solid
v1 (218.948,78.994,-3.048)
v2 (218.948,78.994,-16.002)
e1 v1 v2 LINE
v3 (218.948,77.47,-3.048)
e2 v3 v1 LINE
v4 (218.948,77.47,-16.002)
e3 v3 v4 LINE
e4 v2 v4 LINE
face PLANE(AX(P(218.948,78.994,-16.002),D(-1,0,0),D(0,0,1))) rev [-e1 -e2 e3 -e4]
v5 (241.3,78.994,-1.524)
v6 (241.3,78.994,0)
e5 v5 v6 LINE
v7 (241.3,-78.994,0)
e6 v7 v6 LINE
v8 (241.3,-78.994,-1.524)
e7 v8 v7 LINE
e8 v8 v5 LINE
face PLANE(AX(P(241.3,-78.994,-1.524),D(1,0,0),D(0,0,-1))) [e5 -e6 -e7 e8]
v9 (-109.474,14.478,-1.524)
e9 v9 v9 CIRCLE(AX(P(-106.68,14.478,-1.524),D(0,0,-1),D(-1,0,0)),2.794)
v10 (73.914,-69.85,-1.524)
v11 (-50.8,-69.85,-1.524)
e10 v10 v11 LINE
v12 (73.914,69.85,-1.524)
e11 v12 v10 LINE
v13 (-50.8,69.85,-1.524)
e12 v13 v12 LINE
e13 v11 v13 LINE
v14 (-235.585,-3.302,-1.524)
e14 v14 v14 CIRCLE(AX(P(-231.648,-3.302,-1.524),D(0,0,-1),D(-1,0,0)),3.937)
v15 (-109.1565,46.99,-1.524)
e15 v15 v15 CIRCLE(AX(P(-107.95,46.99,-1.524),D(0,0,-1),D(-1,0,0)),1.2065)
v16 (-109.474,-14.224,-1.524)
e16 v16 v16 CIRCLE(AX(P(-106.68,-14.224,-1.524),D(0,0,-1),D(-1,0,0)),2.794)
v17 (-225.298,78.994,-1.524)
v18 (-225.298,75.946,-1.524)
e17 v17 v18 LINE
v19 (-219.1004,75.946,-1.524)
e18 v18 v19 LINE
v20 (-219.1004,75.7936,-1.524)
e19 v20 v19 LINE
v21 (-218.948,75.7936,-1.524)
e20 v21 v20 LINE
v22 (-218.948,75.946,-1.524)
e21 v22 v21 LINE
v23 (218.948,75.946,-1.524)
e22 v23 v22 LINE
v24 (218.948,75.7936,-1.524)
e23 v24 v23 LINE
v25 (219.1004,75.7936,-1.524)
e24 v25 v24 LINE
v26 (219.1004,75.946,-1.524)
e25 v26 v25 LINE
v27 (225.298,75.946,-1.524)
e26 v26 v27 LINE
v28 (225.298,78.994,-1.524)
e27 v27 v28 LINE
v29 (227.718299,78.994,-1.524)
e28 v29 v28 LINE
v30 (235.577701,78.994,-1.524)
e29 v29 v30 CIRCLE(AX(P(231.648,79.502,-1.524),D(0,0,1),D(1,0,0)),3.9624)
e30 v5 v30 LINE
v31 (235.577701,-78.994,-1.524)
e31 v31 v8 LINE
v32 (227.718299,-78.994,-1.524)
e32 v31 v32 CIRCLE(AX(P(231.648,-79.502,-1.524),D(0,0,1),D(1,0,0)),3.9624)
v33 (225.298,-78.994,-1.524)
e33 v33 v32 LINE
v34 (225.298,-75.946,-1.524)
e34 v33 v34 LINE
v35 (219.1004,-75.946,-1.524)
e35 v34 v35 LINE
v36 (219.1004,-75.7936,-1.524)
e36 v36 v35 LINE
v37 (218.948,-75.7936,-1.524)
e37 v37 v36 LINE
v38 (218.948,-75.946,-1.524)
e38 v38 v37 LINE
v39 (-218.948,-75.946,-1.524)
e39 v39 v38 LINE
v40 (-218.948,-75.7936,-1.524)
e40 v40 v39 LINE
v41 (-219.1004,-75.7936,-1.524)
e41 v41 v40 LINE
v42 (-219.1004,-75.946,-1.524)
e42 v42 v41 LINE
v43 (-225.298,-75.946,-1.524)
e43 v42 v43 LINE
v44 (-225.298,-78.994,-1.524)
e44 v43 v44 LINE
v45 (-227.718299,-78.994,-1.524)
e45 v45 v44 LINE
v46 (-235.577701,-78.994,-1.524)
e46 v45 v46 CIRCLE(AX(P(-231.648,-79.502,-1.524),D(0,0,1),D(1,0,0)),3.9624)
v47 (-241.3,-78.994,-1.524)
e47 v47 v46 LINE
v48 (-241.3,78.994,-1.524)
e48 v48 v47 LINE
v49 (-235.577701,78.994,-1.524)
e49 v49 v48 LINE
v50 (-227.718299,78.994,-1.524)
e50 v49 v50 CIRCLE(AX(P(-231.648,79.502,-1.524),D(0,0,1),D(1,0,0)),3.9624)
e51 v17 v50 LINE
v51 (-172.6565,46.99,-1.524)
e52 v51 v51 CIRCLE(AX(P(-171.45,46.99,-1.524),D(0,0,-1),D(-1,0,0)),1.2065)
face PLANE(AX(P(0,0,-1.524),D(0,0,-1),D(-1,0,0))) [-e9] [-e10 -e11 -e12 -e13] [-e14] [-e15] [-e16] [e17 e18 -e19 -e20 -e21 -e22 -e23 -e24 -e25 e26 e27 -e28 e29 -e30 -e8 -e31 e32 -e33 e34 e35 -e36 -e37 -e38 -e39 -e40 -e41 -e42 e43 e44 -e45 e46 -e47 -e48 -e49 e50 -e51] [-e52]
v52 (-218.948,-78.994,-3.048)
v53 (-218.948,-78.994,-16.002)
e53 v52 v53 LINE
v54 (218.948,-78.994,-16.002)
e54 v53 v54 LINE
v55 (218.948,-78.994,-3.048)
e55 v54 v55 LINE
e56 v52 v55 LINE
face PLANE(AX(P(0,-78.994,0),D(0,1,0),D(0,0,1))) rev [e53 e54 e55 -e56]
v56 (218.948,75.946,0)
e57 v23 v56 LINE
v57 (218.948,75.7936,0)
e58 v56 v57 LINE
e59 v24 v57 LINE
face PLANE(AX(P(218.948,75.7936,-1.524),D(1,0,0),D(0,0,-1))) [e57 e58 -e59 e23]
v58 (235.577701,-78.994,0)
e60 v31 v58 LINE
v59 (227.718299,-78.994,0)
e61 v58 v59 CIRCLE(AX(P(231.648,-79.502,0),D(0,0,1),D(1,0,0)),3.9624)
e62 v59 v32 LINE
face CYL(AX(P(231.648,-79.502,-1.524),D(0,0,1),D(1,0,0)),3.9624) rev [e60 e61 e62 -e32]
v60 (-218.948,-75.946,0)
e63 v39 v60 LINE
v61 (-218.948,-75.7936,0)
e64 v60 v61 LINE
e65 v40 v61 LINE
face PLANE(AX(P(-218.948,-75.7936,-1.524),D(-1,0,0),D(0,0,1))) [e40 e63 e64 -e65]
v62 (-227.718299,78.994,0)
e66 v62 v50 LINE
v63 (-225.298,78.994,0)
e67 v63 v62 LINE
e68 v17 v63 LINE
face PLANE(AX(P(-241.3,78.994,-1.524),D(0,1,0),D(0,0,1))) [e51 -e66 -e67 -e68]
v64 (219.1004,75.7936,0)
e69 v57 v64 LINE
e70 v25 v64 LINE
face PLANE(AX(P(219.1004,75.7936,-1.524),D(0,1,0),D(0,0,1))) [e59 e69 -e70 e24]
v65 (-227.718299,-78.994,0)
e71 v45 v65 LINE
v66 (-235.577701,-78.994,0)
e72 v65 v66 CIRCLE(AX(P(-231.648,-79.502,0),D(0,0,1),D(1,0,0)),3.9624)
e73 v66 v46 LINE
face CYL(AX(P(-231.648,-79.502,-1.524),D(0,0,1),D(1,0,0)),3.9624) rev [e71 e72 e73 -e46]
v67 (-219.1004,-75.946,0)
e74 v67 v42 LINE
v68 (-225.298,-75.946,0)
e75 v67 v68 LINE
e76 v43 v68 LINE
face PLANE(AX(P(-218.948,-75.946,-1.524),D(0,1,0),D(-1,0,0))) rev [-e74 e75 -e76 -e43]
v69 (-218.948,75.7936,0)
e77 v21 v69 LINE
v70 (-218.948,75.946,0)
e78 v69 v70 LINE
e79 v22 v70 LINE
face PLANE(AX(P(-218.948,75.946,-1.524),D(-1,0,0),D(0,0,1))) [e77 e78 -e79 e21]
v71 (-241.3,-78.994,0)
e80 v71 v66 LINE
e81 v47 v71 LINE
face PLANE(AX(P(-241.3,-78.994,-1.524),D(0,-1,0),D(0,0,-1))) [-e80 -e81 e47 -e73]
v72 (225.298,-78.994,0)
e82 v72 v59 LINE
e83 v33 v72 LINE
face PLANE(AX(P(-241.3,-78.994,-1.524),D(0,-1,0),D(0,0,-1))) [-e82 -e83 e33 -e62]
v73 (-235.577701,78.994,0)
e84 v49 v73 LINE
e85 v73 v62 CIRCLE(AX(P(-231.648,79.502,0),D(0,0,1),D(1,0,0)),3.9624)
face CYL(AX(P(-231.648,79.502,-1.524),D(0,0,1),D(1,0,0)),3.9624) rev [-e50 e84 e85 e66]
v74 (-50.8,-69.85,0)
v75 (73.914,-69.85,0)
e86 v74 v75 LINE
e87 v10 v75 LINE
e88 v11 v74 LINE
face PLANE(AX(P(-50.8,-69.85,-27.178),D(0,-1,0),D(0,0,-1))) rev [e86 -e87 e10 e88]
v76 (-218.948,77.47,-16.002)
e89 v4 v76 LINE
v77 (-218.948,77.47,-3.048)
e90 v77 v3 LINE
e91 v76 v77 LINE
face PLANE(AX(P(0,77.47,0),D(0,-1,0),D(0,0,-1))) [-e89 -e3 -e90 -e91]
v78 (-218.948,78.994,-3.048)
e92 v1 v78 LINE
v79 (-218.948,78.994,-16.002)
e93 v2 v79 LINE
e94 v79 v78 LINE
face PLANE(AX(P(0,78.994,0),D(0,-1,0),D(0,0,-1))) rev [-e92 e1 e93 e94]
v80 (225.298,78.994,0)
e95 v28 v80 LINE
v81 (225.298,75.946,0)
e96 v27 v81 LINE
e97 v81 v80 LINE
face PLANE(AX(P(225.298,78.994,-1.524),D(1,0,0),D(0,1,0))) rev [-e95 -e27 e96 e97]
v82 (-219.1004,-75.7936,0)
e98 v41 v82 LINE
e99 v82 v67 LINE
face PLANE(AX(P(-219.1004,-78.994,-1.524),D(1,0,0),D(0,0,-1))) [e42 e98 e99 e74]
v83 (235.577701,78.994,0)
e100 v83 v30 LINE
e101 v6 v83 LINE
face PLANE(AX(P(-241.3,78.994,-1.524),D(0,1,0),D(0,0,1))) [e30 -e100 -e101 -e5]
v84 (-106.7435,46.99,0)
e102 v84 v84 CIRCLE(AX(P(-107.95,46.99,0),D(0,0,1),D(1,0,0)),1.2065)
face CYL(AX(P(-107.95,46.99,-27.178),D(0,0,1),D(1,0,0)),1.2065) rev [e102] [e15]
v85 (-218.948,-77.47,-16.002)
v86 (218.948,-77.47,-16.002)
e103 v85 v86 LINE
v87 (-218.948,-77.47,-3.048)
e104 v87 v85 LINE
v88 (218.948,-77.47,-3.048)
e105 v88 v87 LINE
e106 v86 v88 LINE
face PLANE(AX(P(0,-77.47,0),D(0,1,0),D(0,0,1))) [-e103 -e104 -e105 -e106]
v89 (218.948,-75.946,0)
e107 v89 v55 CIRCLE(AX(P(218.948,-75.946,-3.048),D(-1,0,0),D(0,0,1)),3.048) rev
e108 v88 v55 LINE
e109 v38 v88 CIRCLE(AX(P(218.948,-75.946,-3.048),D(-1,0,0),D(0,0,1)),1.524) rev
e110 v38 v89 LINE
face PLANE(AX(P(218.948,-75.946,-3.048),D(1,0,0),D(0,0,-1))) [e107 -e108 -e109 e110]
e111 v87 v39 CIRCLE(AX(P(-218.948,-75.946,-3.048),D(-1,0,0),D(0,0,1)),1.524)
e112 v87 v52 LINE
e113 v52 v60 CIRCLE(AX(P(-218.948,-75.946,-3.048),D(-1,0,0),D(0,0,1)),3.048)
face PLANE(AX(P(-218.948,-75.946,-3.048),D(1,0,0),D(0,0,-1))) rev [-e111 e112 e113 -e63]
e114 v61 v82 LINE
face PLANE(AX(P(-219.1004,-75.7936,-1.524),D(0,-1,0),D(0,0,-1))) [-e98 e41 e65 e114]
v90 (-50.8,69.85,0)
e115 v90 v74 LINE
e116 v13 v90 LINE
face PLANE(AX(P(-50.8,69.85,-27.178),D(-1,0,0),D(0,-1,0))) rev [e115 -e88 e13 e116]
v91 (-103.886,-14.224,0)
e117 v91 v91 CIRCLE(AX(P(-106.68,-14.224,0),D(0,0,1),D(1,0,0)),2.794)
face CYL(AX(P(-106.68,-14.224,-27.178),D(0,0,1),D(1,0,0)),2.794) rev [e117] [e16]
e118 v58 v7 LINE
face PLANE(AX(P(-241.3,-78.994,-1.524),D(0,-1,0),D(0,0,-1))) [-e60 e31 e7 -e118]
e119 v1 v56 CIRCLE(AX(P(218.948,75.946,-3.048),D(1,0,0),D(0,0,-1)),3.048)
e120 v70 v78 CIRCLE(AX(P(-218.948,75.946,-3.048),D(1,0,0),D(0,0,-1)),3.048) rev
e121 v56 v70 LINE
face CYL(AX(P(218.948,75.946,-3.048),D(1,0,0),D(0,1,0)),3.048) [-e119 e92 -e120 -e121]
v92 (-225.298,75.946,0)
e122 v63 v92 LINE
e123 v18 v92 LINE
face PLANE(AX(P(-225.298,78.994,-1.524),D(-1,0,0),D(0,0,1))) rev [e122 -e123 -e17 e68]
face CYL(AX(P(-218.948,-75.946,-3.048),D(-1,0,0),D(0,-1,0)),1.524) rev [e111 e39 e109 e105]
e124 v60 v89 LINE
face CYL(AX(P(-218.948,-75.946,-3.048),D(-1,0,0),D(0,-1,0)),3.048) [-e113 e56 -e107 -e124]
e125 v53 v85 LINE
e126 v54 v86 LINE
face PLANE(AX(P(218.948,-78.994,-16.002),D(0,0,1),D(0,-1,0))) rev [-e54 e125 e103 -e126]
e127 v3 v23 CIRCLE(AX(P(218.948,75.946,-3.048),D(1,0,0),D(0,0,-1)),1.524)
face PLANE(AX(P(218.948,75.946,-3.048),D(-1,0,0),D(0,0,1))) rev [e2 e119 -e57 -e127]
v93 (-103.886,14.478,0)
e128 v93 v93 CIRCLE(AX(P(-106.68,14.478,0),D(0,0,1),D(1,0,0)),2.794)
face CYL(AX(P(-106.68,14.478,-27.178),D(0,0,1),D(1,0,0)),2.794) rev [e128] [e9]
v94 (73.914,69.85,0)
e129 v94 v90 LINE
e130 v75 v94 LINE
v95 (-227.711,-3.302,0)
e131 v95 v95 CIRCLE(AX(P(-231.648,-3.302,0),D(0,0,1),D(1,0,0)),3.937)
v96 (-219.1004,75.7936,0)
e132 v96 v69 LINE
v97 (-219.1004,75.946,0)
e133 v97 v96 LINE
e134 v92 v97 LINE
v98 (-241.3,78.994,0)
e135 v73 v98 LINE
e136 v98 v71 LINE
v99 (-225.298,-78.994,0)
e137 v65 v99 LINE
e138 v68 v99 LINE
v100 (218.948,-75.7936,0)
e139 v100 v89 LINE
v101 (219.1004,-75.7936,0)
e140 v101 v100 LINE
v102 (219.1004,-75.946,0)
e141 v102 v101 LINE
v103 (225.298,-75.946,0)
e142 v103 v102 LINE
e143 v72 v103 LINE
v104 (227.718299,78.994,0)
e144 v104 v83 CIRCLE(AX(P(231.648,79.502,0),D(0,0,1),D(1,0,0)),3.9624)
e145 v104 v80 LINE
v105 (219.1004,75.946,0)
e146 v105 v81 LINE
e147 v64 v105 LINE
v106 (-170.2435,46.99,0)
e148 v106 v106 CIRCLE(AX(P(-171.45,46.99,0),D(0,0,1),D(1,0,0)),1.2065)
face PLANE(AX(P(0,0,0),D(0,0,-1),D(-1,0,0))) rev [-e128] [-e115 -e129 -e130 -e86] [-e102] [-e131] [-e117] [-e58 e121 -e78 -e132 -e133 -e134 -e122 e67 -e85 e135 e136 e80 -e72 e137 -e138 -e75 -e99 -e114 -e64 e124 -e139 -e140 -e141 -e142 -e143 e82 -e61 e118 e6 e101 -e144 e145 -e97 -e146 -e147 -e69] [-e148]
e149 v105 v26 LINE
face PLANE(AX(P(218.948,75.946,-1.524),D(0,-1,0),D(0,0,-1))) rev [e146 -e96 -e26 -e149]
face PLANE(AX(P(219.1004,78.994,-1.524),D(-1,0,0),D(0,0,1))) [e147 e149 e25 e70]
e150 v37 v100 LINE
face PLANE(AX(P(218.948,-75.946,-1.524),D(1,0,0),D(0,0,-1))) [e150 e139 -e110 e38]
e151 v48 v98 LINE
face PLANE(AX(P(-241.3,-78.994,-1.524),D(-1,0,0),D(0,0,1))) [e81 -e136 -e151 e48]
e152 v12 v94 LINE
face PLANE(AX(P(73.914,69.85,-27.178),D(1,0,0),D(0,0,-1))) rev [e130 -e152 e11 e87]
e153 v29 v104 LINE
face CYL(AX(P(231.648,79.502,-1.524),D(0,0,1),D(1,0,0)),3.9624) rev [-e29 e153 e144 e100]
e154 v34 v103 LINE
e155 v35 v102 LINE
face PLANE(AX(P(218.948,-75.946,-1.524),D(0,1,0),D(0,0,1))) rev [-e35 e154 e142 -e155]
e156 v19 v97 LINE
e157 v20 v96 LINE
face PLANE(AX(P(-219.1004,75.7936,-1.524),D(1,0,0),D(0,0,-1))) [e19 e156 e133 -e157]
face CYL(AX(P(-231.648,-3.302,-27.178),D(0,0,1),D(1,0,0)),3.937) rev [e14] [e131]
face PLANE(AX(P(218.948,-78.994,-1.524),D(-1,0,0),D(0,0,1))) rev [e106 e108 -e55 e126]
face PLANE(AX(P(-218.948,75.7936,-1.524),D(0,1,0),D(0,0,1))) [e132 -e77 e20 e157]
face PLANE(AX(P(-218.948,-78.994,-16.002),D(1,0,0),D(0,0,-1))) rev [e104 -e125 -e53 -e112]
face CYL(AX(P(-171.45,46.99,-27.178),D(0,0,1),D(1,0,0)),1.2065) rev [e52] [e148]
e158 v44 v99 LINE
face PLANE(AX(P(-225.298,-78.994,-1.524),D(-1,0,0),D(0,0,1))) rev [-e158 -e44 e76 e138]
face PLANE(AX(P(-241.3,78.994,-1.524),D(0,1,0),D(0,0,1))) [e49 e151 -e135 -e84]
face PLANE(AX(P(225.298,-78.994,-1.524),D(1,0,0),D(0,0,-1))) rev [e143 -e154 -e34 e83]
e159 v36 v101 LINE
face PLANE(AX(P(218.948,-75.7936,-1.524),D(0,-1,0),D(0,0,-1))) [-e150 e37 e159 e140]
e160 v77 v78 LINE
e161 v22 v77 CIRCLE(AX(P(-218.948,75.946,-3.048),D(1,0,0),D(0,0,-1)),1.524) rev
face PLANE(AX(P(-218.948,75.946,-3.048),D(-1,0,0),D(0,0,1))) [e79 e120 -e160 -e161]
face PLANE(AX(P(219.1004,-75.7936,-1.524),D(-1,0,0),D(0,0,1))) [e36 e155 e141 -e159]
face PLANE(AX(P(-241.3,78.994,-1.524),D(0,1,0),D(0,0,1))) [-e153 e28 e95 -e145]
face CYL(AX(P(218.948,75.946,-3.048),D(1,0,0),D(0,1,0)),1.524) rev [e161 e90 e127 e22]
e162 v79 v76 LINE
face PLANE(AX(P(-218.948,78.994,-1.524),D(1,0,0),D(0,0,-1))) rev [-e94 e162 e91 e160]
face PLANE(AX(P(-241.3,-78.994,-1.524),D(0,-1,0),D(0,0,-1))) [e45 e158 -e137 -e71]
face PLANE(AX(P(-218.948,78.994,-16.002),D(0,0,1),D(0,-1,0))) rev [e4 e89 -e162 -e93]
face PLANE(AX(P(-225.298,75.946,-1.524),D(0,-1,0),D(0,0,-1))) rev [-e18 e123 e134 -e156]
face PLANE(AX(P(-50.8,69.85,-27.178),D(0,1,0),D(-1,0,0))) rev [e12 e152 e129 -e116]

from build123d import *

# Parameters (mm, degrees)
CROQUIS1_W                   = 482.6
CROQUIS1_H                   = 157.988
BRIDA_BASE1_DEPTH            = 1.524
CROQUIS6_R                   = 3.9624
CROQUIS6_W                   = 6.35
CROQUIS6_H                   = 3.048
CORTAR_EXTRUIR1_DEPTH        = 254.905621466
BRIDA_START                  = -218.948
BRIDA_DE_ARISTA1_DEPTH       = 437.896
BRIDA_START_2                = -219.1004
BRIDA_DE_ARISTA1_2_OUTLINE_W = 0.1524
BRIDA_DE_ARISTA1_2_OUTLINE_H = 1.524
BRIDA_DE_ARISTA1_2_DEPTH     = 0.1524
BRIDA_START_3                = 218.948
BRIDA_DE_ARISTA1_3_OUTLINE_W = 0.1524
BRIDA_DE_ARISTA1_3_OUTLINE_H = 1.524
BRIDA_DE_ARISTA1_3_DEPTH     = 0.1524
BRIDA_DE_ARISTA1_4_DEPTH     = 437.896
CROQUIS13_R                  = 2.794
CROQUIS13_R_2                = 1.2065
CROQUIS13_R_3                = 3.937
CROQUIS13_W                  = 124.714
CROQUIS13_H                  = 139.7
CORTAR_EXTRUIR2_DEPTH        = 27.178


# Read off the part's stored shape, not the designer's step: Brida de arista1
# Sheet-metal steps are written as plain solids
with BuildPart() as part:
    # Croquis1 → Brida base1 (new body)
    with BuildSketch(Plane.XY):
        Rectangle(CROQUIS1_W, CROQUIS1_H)
    extrude(amount=-BRIDA_BASE1_DEPTH)

    # Croquis6 → Cortar-Extruir1 (cut, through all)
    with BuildSketch(Plane.XY):
        with Locations((231.648, 79.502)):
            Circle(CROQUIS6_R)
        with Locations((-231.648, 79.502)):
            Circle(CROQUIS6_R)
        with Locations((-231.648, -79.502)):
            Circle(CROQUIS6_R)
        with Locations((231.648, -79.502)):
            Circle(CROQUIS6_R)
        with Locations((-222.123, 77.47)):
            Rectangle(CROQUIS6_W, CROQUIS6_H)
        with Locations((222.123, 77.47)):
            Rectangle(CROQUIS6_W, CROQUIS6_H)
        with Locations((-222.123, -77.47)):
            Rectangle(CROQUIS6_W, CROQUIS6_H)
        with Locations((222.123, -77.47)):
            Rectangle(CROQUIS6_W, CROQUIS6_H)
    extrude(amount=-CORTAR_EXTRUIR1_DEPTH, mode=Mode.SUBTRACT)

    # Brida de arista1 outline → Brida de arista1 (cut)
    with BuildSketch(Plane.YZ.offset(BRIDA_START)):
        with BuildLine():
            ThreePointArc((-78.585645431, -1.524), (-77.47, -0.408354569), (-75.946, 0))
            Line((-75.946, 0), (-78.994, 0))
            Line((-78.994, 0), (-78.994, -1.524))
            Line((-78.994, -1.524), (-78.585645431, -1.524))
        make_face()
        with BuildLine():
            Line((78.994, 0), (75.946, 0))
            ThreePointArc((75.946, 0), (77.47, -0.408354569), (78.585645431, -1.524))
            Line((78.585645431, -1.524), (78.994, -1.524))
            Line((78.994, -1.524), (78.994, 0))
        make_face()
    extrude(amount=BRIDA_DE_ARISTA1_DEPTH, mode=Mode.SUBTRACT)

    # Brida de arista1 2 outline → Brida de arista1 2 (cut)
    with BuildSketch(Plane.YZ.offset(BRIDA_START_2)):
        with Locations((-75.8698, -0.762)):
            Rectangle(BRIDA_DE_ARISTA1_2_OUTLINE_W, BRIDA_DE_ARISTA1_2_OUTLINE_H)
        with Locations((75.8698, -0.762)):
            Rectangle(BRIDA_DE_ARISTA1_2_OUTLINE_W, BRIDA_DE_ARISTA1_2_OUTLINE_H)
    extrude(amount=BRIDA_DE_ARISTA1_2_DEPTH, mode=Mode.SUBTRACT)

    # Brida de arista1 3 outline → Brida de arista1 3 (cut)
    with BuildSketch(Plane.YZ.offset(BRIDA_START_3)):
        with Locations((-75.8698, -0.762)):
            Rectangle(BRIDA_DE_ARISTA1_3_OUTLINE_W, BRIDA_DE_ARISTA1_3_OUTLINE_H)
        with Locations((75.8698, -0.762)):
            Rectangle(BRIDA_DE_ARISTA1_3_OUTLINE_W, BRIDA_DE_ARISTA1_3_OUTLINE_H)
    extrude(amount=BRIDA_DE_ARISTA1_3_DEPTH, mode=Mode.SUBTRACT)

    # Brida de arista1 4 outline → Brida de arista1 4 (add)
    with BuildSketch(Plane.YZ.offset(BRIDA_START)):
        with BuildLine():
            ThreePointArc((-77.47, -3.048), (-77.023630735, -1.970369265), (-75.946, -1.524))
            Line((-75.946, -1.524), (-78.585645431, -1.524))
            ThreePointArc((-78.585645431, -1.524), (-78.890141918, -2.259119551), (-78.994, -3.048))
            Line((-78.994, -3.048), (-78.994, -16.002))
            Line((-78.994, -16.002), (-77.47, -16.002))
            Line((-77.47, -16.002), (-77.47, -3.048))
        make_face()
        with BuildLine():
            Line((78.585645431, -1.524), (75.946, -1.524))
            ThreePointArc((75.946, -1.524), (77.023630735, -1.970369265), (77.47, -3.048))
            Line((77.47, -3.048), (77.47, -16.002))
            Line((77.47, -16.002), (78.994, -16.002))
            Line((78.994, -16.002), (78.994, -3.048))
            ThreePointArc((78.994, -3.048), (78.890141918, -2.259119551), (78.585645431, -1.524))
        make_face()
    extrude(amount=BRIDA_DE_ARISTA1_4_DEPTH)

    # Croquis13 → Cortar-Extruir2 (cut)
    with BuildSketch(Plane.XY):
        with Locations((-106.68, 14.478)):
            Circle(CROQUIS13_R)
        with Locations((-106.68, -14.224)):
            Circle(CROQUIS13_R)
        with Locations((-107.95, 46.99)):
            Circle(CROQUIS13_R_2)
        with Locations((-171.45, 46.99)):
            Circle(CROQUIS13_R_2)
        with Locations((-231.648, -3.302)):
            Circle(CROQUIS13_R_3)
        with Locations((11.557, 0)):
            Rectangle(CROQUIS13_W, CROQUIS13_H)
    extrude(amount=-CORTAR_EXTRUIR2_DEPTH, mode=Mode.SUBTRACT)


solid = part.part
